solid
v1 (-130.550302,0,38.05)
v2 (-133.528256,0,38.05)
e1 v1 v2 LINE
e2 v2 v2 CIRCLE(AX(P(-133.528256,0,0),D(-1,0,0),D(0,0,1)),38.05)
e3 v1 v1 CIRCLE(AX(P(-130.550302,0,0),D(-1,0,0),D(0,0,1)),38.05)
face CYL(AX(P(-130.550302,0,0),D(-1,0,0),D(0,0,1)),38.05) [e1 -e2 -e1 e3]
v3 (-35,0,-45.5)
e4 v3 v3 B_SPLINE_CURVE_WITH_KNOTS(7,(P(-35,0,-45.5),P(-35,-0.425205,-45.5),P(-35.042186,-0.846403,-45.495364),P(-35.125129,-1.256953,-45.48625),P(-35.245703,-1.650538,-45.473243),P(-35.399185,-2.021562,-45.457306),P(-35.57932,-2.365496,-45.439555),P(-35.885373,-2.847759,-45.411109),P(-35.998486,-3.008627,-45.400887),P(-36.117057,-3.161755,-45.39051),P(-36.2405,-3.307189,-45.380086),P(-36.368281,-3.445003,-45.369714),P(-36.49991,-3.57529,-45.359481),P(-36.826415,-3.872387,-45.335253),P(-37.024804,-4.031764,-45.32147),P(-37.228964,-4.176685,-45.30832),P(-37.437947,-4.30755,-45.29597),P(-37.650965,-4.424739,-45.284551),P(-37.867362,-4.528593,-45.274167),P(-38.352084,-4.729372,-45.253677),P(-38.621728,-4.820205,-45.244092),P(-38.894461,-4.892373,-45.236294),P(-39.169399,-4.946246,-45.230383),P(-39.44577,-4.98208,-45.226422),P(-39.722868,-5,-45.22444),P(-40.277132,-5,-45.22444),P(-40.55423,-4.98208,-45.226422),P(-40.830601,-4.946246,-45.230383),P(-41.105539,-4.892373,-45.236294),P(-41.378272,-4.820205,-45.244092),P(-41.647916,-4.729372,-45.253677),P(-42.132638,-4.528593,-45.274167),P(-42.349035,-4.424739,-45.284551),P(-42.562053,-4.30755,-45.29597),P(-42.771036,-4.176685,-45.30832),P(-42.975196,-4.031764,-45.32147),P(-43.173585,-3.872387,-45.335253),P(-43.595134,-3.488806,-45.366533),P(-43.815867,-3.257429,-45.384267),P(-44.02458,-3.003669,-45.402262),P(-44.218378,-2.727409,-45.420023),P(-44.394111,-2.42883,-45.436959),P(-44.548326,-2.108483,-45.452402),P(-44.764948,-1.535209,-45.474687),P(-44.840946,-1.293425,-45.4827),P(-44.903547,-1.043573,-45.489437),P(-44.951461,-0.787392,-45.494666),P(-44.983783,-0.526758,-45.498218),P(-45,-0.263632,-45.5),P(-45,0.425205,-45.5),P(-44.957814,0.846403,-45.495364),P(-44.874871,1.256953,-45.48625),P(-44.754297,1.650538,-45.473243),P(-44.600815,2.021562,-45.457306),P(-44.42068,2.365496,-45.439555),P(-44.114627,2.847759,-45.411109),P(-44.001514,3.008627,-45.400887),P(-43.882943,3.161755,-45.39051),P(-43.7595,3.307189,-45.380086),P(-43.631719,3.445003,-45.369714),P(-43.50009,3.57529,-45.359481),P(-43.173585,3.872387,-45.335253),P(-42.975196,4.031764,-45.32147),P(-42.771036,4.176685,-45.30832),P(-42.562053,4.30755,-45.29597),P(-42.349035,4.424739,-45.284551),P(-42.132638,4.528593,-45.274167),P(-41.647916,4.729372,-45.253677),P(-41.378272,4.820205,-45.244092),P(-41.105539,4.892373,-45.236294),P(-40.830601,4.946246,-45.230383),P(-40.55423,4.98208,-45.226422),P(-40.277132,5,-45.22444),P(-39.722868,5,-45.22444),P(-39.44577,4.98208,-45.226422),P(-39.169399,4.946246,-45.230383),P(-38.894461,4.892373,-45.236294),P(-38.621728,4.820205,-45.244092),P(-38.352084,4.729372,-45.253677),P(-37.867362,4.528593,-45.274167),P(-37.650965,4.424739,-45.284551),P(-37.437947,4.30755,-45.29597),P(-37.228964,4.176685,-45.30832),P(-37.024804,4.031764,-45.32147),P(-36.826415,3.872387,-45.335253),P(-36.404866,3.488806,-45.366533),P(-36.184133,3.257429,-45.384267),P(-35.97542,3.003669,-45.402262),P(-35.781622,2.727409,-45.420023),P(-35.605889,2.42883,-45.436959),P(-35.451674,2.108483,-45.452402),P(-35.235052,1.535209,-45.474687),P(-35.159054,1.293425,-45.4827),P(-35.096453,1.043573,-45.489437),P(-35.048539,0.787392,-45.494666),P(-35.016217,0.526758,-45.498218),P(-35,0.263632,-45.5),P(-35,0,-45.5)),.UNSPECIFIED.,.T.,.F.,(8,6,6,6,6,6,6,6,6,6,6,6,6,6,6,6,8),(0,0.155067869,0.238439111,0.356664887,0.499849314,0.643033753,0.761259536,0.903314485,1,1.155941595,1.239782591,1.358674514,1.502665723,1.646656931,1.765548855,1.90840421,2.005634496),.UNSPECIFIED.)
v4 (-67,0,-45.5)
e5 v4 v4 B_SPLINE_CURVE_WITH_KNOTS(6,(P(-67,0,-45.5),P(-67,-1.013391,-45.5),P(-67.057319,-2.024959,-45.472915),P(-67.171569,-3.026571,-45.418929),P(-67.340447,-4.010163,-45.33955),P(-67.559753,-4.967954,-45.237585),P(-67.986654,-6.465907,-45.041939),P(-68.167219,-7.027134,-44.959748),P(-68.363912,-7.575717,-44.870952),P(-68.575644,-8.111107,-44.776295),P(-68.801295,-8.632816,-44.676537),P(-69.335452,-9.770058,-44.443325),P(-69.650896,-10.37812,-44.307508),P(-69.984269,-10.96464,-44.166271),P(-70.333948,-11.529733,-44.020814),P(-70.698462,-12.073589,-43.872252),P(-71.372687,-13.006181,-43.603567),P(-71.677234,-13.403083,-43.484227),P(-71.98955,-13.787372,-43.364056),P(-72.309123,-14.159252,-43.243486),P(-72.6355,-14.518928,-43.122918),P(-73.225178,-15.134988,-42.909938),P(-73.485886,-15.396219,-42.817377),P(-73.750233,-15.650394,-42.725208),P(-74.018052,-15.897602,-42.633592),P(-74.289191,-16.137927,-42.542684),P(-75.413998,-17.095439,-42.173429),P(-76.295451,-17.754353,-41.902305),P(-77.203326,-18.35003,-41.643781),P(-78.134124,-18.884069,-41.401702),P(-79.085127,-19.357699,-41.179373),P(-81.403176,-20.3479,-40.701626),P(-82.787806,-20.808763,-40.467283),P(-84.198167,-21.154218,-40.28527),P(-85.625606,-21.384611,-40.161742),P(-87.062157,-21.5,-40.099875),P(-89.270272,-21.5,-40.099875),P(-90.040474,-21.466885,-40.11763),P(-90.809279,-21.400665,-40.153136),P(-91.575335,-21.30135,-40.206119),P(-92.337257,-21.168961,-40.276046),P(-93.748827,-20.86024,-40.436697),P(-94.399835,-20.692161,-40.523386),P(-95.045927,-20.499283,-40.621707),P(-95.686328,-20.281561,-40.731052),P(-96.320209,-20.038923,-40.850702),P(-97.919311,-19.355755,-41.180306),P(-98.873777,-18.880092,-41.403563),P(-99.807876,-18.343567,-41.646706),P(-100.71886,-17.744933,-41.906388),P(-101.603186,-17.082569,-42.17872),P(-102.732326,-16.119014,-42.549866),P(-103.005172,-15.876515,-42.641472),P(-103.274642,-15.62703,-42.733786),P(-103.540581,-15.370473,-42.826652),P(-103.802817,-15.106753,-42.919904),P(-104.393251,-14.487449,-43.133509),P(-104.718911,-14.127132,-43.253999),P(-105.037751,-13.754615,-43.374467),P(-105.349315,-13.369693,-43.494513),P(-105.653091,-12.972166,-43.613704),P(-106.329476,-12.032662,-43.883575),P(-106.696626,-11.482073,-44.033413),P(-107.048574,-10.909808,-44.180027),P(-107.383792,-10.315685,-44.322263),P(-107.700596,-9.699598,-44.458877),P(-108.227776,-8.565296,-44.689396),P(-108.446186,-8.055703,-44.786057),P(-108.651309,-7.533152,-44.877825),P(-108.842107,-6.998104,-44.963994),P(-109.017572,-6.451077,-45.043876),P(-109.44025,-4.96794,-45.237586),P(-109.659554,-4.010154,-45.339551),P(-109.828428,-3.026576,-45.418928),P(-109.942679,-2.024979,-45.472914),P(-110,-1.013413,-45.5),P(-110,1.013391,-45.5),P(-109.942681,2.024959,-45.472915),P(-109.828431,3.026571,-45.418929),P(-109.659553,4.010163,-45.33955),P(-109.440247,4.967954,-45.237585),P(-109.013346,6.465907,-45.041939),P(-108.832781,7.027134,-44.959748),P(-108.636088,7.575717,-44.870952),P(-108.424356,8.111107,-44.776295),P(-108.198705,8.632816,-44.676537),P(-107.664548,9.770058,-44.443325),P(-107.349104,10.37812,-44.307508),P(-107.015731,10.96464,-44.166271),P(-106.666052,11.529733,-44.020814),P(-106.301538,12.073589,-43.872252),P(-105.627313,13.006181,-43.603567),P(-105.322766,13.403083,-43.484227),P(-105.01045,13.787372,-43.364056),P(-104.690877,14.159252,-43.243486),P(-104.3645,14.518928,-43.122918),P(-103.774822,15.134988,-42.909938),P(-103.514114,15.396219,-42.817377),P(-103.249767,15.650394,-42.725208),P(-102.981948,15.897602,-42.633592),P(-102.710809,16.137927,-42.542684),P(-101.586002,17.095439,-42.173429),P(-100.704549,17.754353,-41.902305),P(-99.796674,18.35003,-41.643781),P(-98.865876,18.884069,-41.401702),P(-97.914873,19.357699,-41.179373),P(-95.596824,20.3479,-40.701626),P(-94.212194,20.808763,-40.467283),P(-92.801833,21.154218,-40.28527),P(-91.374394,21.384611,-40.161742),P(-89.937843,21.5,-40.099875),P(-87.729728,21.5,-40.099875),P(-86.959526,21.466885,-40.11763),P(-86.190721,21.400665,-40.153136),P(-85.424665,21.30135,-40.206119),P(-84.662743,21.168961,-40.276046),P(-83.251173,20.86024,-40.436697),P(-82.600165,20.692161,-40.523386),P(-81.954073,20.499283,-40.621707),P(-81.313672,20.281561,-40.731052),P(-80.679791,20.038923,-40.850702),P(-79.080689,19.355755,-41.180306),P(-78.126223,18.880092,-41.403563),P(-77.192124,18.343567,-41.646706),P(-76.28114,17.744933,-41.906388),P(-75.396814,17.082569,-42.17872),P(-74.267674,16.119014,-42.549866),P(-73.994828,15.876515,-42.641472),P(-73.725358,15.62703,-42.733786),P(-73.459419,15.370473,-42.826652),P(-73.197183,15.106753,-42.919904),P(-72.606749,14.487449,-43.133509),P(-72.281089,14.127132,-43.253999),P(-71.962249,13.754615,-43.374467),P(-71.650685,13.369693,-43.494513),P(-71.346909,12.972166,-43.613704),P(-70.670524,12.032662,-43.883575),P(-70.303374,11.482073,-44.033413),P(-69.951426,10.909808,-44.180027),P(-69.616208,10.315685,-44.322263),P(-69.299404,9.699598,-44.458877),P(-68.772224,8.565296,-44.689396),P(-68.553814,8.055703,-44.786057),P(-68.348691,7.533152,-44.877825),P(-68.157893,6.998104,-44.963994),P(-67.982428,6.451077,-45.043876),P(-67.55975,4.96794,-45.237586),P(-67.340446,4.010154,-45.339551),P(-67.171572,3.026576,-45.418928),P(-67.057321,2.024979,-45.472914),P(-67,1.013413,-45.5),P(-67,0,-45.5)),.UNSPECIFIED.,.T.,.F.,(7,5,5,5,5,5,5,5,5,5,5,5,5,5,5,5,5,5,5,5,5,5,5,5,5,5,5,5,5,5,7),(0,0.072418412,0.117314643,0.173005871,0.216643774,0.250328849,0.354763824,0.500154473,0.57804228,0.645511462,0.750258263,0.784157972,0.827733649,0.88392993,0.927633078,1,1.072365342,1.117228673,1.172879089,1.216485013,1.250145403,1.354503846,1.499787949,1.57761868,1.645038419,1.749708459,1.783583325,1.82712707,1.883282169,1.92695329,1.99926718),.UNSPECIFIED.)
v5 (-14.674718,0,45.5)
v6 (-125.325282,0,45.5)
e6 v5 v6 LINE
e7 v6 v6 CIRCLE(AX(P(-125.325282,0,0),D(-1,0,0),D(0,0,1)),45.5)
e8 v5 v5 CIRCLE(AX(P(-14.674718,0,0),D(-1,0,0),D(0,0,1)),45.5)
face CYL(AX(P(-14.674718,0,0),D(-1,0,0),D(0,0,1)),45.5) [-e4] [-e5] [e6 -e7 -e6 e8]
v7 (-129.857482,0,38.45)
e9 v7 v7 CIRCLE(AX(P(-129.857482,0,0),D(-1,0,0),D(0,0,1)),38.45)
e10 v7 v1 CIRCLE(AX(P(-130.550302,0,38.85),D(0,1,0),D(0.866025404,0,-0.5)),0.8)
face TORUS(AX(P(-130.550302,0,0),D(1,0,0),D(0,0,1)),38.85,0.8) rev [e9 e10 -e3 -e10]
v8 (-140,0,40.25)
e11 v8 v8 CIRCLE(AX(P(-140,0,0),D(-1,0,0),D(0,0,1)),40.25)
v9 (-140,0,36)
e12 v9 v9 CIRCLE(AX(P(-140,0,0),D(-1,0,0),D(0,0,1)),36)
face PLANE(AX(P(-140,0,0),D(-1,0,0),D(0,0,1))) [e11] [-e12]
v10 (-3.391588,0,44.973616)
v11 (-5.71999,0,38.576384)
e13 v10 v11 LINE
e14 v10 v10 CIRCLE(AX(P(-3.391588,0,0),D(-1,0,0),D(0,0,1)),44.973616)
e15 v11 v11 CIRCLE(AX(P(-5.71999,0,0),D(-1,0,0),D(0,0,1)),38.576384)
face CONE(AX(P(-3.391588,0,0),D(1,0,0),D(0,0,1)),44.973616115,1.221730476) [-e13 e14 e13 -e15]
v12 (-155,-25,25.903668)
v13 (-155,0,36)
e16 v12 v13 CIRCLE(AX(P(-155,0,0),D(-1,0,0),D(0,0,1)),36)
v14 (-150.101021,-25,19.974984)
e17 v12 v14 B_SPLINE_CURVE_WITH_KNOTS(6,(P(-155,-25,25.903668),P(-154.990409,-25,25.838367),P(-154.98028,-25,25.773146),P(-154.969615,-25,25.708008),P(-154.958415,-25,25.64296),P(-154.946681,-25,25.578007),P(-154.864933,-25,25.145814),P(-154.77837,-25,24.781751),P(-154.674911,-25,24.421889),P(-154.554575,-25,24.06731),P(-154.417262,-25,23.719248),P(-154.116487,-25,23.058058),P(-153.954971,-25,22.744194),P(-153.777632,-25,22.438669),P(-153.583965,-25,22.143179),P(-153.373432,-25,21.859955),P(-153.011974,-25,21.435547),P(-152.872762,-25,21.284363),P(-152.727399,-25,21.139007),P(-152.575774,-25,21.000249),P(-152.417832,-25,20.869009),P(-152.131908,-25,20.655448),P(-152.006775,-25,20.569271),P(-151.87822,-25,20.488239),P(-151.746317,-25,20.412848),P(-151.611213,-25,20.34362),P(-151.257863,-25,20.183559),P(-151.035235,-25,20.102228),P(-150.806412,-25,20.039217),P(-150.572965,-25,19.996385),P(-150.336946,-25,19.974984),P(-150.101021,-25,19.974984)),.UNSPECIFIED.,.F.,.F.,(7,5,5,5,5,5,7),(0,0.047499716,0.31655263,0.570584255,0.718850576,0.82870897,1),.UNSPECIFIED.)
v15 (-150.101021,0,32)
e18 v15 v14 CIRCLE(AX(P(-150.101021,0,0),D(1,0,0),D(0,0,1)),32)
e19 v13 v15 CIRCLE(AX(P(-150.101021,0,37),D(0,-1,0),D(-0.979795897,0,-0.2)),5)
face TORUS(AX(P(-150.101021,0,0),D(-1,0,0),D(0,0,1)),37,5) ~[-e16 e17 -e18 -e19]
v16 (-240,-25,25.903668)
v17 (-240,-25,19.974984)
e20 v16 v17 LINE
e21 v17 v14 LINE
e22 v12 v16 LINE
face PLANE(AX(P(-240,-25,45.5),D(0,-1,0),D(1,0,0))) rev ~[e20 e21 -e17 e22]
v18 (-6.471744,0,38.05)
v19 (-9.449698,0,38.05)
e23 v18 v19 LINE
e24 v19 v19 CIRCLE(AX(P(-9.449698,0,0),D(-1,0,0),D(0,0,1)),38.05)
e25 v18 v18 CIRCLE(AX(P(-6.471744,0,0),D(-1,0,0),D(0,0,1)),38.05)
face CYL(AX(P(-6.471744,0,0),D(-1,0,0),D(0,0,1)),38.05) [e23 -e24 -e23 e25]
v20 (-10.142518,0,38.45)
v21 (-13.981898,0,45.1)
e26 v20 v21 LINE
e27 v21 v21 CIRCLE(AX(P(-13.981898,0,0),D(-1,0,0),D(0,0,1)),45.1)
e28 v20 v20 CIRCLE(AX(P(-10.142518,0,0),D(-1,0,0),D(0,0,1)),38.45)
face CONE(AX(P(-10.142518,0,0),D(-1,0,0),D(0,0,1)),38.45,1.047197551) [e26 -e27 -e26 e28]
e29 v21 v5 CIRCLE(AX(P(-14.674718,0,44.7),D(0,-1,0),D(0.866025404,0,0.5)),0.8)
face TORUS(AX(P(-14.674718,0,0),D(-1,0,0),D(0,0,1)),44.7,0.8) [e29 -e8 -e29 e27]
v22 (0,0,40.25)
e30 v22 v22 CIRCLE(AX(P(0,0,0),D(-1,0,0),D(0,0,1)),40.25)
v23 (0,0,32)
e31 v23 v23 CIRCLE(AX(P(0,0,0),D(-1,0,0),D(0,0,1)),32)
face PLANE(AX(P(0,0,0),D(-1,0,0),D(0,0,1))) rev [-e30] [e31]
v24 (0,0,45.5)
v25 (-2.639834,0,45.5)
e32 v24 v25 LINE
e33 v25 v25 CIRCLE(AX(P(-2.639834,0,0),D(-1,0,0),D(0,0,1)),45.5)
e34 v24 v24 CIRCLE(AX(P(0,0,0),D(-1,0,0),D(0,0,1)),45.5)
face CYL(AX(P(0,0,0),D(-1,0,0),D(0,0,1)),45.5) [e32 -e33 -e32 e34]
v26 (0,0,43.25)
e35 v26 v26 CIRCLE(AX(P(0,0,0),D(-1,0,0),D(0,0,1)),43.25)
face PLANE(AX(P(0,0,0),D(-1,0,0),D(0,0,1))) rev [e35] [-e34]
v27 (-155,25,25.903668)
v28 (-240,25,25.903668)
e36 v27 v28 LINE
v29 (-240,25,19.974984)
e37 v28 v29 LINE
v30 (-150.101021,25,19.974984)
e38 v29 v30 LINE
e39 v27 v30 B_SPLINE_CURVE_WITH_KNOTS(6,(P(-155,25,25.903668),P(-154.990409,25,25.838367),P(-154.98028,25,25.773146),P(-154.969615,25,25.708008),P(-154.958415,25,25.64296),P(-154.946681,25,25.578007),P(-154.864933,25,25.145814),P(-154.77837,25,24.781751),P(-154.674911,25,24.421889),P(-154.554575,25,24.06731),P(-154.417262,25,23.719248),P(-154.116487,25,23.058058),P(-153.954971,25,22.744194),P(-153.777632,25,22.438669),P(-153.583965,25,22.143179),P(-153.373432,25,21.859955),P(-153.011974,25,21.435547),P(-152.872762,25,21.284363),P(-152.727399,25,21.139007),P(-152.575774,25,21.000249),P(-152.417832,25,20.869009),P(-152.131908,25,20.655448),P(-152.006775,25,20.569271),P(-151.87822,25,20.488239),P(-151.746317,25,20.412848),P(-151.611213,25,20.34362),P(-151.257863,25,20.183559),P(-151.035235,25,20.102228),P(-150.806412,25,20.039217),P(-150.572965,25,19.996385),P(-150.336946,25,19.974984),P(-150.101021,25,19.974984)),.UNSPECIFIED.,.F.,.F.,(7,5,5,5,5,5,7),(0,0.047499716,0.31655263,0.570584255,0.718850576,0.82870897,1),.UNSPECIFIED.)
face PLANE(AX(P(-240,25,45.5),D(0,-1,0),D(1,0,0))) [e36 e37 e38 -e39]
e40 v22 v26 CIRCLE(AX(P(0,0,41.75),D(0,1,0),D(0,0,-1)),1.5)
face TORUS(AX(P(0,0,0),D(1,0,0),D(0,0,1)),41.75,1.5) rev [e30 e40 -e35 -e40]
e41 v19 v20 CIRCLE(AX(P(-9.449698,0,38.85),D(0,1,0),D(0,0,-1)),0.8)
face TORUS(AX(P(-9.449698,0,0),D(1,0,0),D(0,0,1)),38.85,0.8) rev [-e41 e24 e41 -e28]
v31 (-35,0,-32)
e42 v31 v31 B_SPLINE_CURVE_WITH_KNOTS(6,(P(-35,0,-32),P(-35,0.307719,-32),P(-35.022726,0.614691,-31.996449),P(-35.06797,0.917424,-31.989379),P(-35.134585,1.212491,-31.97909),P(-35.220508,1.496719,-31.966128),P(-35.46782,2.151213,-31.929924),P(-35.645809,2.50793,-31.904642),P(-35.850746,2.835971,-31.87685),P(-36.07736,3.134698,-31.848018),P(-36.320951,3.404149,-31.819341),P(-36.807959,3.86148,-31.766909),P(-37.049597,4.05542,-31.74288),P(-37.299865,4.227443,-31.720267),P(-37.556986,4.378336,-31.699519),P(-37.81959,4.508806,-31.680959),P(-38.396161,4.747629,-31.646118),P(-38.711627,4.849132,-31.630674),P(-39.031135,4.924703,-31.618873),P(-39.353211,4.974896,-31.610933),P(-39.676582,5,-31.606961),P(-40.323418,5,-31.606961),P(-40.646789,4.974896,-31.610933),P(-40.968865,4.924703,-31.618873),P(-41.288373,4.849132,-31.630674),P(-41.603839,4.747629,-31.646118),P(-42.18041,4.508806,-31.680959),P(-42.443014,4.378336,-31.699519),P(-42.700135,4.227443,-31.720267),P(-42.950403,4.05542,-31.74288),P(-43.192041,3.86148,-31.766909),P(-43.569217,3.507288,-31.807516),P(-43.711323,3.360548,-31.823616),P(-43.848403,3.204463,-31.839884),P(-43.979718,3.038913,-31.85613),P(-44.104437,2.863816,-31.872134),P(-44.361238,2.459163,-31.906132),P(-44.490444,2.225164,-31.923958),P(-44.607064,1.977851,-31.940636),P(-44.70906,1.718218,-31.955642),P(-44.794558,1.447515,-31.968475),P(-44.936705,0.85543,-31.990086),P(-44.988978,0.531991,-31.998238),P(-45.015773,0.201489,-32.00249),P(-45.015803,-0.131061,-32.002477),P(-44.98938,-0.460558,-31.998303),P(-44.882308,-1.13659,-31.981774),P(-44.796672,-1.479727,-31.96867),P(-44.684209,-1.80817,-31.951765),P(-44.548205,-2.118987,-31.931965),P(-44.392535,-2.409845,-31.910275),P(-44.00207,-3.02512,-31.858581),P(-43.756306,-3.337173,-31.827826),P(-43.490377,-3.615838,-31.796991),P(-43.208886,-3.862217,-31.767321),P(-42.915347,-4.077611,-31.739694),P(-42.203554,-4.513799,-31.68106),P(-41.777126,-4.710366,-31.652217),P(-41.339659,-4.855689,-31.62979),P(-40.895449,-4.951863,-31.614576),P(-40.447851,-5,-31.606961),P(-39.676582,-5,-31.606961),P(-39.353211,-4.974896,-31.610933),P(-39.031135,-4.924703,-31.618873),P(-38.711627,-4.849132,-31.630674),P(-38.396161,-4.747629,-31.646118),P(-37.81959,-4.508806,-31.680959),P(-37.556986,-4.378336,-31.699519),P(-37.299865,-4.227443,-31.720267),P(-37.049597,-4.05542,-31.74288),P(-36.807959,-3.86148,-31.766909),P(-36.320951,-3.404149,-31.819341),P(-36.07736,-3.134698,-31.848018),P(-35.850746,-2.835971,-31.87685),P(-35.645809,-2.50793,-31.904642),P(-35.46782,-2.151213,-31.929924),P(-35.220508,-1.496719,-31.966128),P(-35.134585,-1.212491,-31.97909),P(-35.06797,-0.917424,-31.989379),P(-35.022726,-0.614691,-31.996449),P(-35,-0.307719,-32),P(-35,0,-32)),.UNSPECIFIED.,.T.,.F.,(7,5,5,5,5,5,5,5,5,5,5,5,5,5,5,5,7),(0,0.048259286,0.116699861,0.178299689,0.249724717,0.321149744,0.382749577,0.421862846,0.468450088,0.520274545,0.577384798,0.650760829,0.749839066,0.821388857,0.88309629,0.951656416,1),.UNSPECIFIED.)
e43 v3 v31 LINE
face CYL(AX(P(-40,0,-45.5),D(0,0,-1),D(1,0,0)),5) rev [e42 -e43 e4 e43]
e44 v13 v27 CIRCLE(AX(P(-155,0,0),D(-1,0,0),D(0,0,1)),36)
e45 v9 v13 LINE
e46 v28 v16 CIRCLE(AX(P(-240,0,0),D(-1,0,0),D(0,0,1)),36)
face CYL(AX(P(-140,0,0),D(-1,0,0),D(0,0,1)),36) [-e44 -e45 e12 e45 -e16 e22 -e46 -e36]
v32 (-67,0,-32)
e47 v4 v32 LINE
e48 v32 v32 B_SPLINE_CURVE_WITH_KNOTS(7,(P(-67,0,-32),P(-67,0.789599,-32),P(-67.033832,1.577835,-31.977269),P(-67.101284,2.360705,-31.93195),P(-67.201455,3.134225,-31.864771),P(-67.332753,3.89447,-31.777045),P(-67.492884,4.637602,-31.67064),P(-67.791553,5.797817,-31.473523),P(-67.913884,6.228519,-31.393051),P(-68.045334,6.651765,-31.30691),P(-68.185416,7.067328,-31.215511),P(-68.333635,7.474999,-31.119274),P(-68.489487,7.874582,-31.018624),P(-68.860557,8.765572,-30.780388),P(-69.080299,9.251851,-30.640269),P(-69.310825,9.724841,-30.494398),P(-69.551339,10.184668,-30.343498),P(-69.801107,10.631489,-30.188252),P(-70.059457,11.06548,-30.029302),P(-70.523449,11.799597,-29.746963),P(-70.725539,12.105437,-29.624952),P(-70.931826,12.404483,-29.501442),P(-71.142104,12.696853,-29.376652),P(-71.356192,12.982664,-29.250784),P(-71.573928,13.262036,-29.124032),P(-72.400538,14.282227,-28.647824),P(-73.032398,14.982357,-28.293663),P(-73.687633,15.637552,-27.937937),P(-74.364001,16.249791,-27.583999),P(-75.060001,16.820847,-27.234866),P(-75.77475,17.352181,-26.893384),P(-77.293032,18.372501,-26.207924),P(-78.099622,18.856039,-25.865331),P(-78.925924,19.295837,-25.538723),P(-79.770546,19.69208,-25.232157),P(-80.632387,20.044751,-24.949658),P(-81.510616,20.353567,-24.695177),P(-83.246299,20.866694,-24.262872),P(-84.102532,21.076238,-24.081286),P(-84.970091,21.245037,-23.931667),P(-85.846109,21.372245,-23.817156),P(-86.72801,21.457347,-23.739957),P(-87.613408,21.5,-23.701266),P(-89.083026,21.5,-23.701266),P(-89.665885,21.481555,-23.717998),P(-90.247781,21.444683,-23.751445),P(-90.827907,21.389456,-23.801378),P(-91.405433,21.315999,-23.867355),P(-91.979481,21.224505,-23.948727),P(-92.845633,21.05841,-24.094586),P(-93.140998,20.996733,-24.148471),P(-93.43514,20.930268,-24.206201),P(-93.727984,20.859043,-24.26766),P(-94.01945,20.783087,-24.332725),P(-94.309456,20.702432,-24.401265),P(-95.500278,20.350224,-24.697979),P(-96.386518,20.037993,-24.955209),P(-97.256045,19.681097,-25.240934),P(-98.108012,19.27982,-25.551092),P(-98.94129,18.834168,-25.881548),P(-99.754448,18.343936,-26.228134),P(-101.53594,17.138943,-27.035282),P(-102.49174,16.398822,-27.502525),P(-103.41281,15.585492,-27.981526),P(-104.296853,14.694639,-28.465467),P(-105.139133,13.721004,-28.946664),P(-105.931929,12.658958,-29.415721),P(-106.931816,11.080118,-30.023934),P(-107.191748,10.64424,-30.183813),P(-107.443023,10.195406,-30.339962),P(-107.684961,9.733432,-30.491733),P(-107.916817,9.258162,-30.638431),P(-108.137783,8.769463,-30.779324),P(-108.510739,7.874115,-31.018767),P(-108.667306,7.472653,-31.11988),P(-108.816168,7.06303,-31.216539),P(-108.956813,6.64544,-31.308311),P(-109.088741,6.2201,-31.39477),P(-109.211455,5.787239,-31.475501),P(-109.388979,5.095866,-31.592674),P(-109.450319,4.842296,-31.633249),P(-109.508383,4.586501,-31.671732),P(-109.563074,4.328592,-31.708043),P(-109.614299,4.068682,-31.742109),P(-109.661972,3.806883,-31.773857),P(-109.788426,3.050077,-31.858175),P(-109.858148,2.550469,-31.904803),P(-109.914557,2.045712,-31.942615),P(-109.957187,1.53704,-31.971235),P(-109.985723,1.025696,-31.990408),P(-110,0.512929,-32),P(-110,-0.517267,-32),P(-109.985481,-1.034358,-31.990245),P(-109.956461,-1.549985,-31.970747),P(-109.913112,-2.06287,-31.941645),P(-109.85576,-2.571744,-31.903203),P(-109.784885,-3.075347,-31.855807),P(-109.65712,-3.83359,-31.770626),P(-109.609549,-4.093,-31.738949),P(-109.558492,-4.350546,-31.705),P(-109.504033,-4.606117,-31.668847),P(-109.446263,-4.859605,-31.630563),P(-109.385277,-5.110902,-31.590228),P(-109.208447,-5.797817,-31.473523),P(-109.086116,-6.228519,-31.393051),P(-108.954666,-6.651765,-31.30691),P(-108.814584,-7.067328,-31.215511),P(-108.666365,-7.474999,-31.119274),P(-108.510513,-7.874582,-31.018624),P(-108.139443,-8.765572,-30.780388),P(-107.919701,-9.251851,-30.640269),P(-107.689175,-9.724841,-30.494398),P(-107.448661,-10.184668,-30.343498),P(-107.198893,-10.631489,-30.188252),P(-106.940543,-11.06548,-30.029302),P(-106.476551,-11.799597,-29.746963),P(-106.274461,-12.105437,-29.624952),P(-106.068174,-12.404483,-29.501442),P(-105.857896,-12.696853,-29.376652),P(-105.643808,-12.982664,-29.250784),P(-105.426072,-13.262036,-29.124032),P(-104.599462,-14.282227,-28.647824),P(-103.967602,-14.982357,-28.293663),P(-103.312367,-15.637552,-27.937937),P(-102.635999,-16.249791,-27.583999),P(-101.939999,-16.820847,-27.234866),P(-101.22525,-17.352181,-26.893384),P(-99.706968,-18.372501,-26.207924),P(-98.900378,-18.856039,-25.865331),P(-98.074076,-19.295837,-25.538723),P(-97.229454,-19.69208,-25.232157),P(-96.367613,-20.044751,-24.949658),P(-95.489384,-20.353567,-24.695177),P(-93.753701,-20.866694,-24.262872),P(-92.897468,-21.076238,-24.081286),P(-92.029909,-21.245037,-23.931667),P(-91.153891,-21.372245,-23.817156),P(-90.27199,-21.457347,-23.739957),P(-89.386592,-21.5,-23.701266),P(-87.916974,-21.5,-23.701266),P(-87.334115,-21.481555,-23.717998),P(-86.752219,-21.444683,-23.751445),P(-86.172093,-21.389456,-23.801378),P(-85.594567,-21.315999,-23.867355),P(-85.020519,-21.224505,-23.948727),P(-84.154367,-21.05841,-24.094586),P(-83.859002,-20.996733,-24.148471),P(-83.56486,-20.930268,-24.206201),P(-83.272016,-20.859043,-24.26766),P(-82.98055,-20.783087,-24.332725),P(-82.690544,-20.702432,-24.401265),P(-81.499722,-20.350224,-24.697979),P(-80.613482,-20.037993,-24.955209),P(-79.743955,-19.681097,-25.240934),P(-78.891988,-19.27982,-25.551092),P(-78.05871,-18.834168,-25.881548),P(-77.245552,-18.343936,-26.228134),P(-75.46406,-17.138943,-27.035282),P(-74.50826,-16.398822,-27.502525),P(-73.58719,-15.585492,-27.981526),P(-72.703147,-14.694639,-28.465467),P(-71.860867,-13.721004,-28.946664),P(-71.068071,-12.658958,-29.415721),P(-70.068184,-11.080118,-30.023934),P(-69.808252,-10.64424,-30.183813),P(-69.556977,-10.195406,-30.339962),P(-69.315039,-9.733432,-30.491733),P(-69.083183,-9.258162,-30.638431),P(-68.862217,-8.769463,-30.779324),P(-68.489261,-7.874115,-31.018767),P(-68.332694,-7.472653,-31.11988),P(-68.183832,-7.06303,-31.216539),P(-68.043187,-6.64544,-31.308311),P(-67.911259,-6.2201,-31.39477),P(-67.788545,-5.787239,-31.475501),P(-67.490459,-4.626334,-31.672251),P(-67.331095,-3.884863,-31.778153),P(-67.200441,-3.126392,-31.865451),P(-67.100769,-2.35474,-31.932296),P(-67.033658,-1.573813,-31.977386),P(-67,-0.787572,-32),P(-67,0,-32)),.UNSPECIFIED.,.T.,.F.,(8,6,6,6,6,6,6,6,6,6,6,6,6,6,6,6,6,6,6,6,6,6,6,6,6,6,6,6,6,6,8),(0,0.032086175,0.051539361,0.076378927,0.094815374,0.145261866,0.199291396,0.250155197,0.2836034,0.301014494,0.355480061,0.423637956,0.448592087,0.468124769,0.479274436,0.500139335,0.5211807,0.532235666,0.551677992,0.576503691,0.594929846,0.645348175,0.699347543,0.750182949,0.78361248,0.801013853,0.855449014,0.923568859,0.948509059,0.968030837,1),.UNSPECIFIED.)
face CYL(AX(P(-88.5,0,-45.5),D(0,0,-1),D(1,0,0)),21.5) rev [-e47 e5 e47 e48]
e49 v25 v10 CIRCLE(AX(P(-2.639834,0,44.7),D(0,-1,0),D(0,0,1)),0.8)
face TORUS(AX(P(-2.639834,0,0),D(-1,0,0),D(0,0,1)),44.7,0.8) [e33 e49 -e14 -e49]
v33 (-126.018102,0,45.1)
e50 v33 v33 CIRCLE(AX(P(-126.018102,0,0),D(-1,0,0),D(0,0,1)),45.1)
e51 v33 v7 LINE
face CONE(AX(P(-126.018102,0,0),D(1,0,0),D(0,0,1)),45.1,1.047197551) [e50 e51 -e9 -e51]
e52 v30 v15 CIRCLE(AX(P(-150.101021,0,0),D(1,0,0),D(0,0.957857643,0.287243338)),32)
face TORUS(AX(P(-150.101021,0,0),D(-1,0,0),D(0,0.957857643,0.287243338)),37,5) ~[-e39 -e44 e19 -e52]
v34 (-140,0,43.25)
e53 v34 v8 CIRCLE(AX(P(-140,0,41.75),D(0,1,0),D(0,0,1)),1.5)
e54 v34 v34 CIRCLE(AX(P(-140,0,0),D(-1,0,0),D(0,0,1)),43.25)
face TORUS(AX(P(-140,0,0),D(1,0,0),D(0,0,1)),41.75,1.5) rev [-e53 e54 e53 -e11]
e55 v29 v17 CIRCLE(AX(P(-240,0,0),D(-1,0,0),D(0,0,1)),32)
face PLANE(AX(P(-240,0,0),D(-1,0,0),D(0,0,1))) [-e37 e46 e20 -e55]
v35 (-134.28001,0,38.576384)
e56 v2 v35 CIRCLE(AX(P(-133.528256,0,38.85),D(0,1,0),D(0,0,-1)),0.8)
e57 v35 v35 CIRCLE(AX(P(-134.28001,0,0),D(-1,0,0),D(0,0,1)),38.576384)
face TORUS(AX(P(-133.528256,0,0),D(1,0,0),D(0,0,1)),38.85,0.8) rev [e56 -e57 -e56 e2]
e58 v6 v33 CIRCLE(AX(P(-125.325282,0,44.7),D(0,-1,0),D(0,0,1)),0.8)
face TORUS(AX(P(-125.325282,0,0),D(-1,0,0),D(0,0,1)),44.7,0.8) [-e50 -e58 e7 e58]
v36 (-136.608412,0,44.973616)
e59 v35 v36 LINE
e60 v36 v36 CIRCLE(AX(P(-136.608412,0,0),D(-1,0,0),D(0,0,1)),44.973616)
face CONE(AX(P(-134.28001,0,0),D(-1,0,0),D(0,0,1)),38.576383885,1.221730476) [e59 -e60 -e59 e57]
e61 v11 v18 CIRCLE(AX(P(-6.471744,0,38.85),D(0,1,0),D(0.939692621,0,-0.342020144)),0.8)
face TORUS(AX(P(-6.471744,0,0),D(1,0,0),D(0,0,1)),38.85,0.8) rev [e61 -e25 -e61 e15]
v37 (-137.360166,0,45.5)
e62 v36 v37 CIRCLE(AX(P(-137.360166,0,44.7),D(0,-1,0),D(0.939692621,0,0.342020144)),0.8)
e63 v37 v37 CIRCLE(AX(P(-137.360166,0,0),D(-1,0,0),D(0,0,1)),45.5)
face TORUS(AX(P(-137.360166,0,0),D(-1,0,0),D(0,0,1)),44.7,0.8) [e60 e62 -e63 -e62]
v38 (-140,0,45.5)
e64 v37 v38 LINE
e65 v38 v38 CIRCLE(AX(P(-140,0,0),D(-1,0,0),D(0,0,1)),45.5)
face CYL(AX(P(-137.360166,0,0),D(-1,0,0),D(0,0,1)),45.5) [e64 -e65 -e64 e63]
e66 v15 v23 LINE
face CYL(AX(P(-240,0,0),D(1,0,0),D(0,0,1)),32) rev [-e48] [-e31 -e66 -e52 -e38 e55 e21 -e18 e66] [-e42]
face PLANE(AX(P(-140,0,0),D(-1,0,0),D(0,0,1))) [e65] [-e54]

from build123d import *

# Parameters (mm, degrees)
F3_R        = 21.5
F4_DEPTH    = 25
F6_W        = 85
F6_H        = 50
F7_DEPTH    = 30
F8_T4_ANGLE = 73.3070095704
F8_T9_ANGLE = 73.3070095704
F9_R        = 5
F10_DEPTH   = 50


# Not quite as in the source:
# - a fillet or chamfer that OpenCascade refuses, or shapes differently, is made with other operations: its cross-section is extruded or revolved along the edge and cut away or added


with BuildPart() as f1:
    # F0 (on Front) → F1 (revolve)
    with BuildSketch(Plane.XZ):
        with BuildLine():
            Line((-240, 36), (-240, 32))
            Line((-240, 32), (0, 32))
            Line((0, 32), (0, 40.25))
            ThreePointArc((0, 40.25), (-1.5, 41.75), (0, 43.25))
            Line((0, 43.25), (0, 45.5))
            Line((0, 45.5), (-2.6398339694, 45.5))
            ThreePointArc((-2.6398339694, 45.5), (-3.0986951185, 45.3553216354), (-3.3915880661, 44.9736161147))
            Line((-3.3915880661, 44.9736161147), (-5.7199901792, 38.5763838853))
            ThreePointArc((-5.7199901792, 38.5763838853), (-6.0128831268, 38.1946783646), (-6.4717442759, 38.05))
            Line((-6.4717442759, 38.05), (-9.4496980299, 38.05))
            ThreePointArc((-9.4496980299, 38.05), (-9.8496980299, 38.157179677), (-10.142518353, 38.45))
            Line((-10.142518353, 38.45), (-13.9818976431, 45.1))
            ThreePointArc((-13.9818976431, 45.1), (-14.2747179661, 45.392820323), (-14.6747179661, 45.5))
            Line((-14.6747179661, 45.5), (-125.3252820339, 45.5))
            ThreePointArc((-125.3252820339, 45.5), (-125.7252820339, 45.392820323), (-126.0181023569, 45.1))
            Line((-126.0181023569, 45.1), (-129.857481647, 38.45))
            ThreePointArc((-129.857481647, 38.45), (-130.1503019701, 38.157179677), (-130.5503019701, 38.05))
            Line((-130.5503019701, 38.05), (-133.5282557241, 38.05))
            ThreePointArc((-133.5282557241, 38.05), (-133.9871168732, 38.1946783646), (-134.2800098208, 38.5763838853))
            Line((-134.2800098208, 38.5763838853), (-136.6084119339, 44.9736161147))
            ThreePointArc((-136.6084119339, 44.9736161147), (-136.9013048815, 45.3553216354), (-137.3601660306, 45.5))
            Line((-137.3601660306, 45.5), (-140, 45.5))
            Line((-140, 45.5), (-140, 43.25))
            ThreePointArc((-140, 43.25), (-138.5, 41.75), (-140, 40.25))
            Line((-140, 40.25), (-140, 36))
            Line((-140, 36), (-240, 36))
        make_face()
    revolve(axis=Axis((-38.3716828611, 0, 0), (-1, 0, 0)))

    # F3 (on offset) → F4 (cut)
    with BuildSketch(Plane.XY.offset(-45.5)):
        with Locations((-88.5, 0)):
            Circle(F3_R)
    extrude(amount=F4_DEPTH, mode=Mode.SUBTRACT)

    # F6 (on offset) → F7 (cut)
    with BuildSketch(Plane.XY.offset(45.5)):
        with Locations((-197.5, 0)):
            Rectangle(F6_W, F6_H)
    extrude(amount=-F7_DEPTH, mode=Mode.SUBTRACT)

    # F8: fillet of radius 5 on 2 edges, made by hand


with BuildPart() as f8_tool2:
    # F8_s3 → F8_t4 (revolve)
    with BuildSketch(Plane.XZ):
        with BuildLine():
            ThreePointArc((-155, 36), (-153.2632981746, 33.1270166538), (-150.1010205144, 32))
            Line((-150.1010205144, 32), (-155, 32))
            Line((-155, 32), (-155, 36))
        make_face()
    revolve(axis=Axis((-155, 0, 0), (1, 0, 0)), revolution_arc=F8_T4_ANGLE)

    split(bisect_by=Plane.XZ.offset(25), keep=Keep.BOTTOM)


with BuildPart() as f1_1:
    add(f1.part)

    # F8_t1: cut F8_tool2
    add(f8_tool2.part, mode=Mode.SUBTRACT)


with BuildPart() as f8_tool7:
    # F8_s8 → F8_t9 (revolve)
    with BuildSketch(Plane(origin=(0, 0, 0), x_dir=(1, 0, 0), z_dir=(0, 0.2872433376, -0.9578576434))):
        with BuildLine():
            ThreePointArc((-155, -36), (-153.2632981746, -33.1270166538), (-150.1010205144, -32))
            Line((-150.1010205144, -32), (-155, -32))
            Line((-155, -32), (-155, -36))
        make_face()
    revolve(axis=Axis((-155, 0, 0), (1, 0, 0)), revolution_arc=F8_T9_ANGLE)

    split(bisect_by=Plane.XZ.offset(-25), keep=Keep.TOP)


with BuildPart() as f1_2:
    add(f1_1.part)

    # F8_t6: cut F8_tool7
    add(f8_tool7.part, mode=Mode.SUBTRACT)

    # F9 (on offset) → F10 (cut)
    with BuildSketch(Plane.XY.offset(-45.5)):
        with Locations((-40, 0)):
            Circle(F9_R)
    extrude(amount=F10_DEPTH, mode=Mode.SUBTRACT)


solid = f1_2.part
